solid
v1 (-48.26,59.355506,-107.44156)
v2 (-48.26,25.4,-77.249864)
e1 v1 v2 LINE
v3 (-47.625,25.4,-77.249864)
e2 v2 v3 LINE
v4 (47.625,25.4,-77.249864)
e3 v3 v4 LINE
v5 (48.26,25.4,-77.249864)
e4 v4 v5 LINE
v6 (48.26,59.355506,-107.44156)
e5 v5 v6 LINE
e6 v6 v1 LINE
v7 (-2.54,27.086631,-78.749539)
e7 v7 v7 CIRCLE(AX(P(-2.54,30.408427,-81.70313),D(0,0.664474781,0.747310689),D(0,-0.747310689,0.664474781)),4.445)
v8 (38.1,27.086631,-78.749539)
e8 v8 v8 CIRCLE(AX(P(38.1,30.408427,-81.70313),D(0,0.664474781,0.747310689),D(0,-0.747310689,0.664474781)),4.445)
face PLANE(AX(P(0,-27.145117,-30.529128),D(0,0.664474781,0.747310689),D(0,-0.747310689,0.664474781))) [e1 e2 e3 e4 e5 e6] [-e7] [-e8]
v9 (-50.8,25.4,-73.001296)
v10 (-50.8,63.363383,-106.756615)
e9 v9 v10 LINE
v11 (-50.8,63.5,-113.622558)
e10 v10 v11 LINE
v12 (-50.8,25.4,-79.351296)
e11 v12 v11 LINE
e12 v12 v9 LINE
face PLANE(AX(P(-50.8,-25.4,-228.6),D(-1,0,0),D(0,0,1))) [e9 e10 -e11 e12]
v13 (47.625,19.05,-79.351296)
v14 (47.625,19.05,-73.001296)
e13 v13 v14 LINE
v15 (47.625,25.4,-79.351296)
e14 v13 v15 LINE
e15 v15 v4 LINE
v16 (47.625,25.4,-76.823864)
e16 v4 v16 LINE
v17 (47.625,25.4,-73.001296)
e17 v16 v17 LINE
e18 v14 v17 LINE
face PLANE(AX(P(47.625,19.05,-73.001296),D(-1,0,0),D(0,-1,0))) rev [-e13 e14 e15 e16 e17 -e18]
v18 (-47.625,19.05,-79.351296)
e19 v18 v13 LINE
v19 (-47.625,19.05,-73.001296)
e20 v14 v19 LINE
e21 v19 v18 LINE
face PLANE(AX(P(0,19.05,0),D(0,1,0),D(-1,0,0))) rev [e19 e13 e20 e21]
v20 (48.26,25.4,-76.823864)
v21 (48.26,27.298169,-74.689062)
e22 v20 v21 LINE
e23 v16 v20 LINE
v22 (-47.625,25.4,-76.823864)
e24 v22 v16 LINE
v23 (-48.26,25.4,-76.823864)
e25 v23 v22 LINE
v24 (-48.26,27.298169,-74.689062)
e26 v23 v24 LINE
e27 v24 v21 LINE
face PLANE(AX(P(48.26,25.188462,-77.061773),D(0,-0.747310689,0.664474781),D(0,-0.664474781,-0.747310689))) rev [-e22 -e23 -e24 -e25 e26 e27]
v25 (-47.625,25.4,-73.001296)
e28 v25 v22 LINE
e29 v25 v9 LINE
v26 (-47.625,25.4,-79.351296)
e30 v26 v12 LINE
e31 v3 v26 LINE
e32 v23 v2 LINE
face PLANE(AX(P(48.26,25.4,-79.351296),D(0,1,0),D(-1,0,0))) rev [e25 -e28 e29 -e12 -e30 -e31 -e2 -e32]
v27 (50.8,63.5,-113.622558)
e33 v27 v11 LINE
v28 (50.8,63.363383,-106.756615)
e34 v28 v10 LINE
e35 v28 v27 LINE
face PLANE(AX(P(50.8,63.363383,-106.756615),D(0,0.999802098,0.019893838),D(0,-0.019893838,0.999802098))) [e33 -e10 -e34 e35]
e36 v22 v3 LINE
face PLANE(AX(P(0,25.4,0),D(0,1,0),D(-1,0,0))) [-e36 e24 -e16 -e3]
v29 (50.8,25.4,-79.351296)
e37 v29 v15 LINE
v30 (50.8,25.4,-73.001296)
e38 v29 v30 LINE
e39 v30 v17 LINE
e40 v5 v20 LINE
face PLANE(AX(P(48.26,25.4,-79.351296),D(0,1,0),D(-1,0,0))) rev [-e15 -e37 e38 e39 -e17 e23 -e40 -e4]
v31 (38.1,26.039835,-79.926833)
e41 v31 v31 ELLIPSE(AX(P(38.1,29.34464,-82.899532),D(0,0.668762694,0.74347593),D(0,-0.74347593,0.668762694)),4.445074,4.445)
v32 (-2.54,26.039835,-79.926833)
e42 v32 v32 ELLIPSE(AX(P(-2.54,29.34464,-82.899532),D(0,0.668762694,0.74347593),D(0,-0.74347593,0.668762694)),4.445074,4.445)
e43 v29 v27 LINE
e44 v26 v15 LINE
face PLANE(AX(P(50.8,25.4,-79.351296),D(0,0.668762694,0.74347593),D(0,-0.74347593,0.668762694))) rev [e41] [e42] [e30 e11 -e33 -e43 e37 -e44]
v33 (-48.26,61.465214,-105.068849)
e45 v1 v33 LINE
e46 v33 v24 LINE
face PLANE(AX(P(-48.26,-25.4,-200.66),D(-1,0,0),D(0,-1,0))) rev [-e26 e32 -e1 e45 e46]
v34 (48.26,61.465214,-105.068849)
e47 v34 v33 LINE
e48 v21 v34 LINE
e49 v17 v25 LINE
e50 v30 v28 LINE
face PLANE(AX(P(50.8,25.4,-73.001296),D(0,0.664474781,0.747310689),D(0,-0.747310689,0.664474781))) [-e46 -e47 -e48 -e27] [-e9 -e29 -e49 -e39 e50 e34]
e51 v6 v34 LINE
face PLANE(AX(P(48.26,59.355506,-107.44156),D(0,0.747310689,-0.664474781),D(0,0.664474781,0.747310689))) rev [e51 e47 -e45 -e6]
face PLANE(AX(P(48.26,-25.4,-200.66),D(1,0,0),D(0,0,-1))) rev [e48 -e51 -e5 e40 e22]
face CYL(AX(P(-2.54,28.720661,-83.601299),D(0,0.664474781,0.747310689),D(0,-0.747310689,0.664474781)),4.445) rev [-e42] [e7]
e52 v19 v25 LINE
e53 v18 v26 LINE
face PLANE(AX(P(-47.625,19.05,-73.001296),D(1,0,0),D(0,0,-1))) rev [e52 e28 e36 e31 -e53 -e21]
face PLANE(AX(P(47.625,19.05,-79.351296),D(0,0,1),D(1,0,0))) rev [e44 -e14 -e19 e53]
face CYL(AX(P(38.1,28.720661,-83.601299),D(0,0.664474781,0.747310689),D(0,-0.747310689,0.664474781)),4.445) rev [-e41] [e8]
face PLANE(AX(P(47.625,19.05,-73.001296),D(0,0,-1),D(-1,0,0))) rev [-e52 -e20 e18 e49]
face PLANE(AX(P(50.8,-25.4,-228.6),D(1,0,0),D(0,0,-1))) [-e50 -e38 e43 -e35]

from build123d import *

# Parameters (mm, degrees)
SKETCH1_W            = 101.6
SKETCH1_H            = 50.8
BOSS_EXTRUDE1_DEPTH  = 228.6
SKETCH2_W            = 96.52
SKETCH2_H            = 172.72
CUT_EXTRUDE1_DEPTH   = 50.8
BOSS_EXTRUDE2_DEPTH  = 50.8
BOSS_EXTRUDE3_DEPTH  = 101.6
SKETCH13_W           = 96.52
SKETCH13_H           = 25.4
CUT_EXTRUDE2_DEPTH   = 50.8
SKETCH14_W           = 96.52
SKETCH14_H           = 25.4
CUT_EXTRUDE3_DEPTH   = 50.8
SKETCH15_W           = 96.52
SKETCH15_H           = 50.8
CUT_EXTRUDE6_DEPTH   = 6.35
SKETCH16_W           = 96.52
SKETCH16_H           = 45.72
CUT_EXTRUDE7_DEPTH   = 3.175
SKETCH17_W           = 101.6
SKETCH17_H           = 25.4
CUT_EXTRUDE8_DEPTH   = 228.6
SKETCH20_W           = 6.35
SKETCH20_H           = 12.7
BOSS_EXTRUDE5_DEPTH  = 101.6
SKETCH24_W           = 12.7
SKETCH24_H           = 6.35
BOSS_EXTRUDE8_DEPTH  = 19.05
SKETCH26_W           = 12.7
SKETCH26_H           = 6.35
BOSS_EXTRUDE10_DEPTH = 19.05
SKETCH27_W           = 12.7
SKETCH27_H           = 6.35
BOSS_EXTRUDE11_DEPTH = 19.05
SKETCH33_W           = 96.52
SKETCH33_H           = 2.54
BOSS_EXTRUDE13_DEPTH = 2.54
SKETCH34_W           = 96.52
SKETCH34_H           = 2.54
BOSS_EXTRUDE17_DEPTH = 2.54
SKETCH36_W           = 218.44
SKETCH36_H           = 2.54
BOSS_EXTRUDE18_DEPTH = 2.54
SKETCH37_W           = 218.44
SKETCH37_H           = 2.54
BOSS_EXTRUDE19_DEPTH = 2.54
SKETCH45_W           = 13.208
SKETCH45_H           = 10.16
CUT_EXTRUDE19_DEPTH  = 6.35
CUT_EXTRUDE22_START  = -101.6
CUT_EXTRUDE22_DEPTH  = 101.6
SKETCH60_R           = 4.445
CUT_EXTRUDE23_DEPTH  = 2.54
SKETCH61_R           = 4.445
CUT_EXTRUDE24_DEPTH  = 2.54
SKETCH64_W           = 95.25
SKETCH64_H           = 6.35
BOSS_EXTRUDE33_DEPTH = 6.35


# Read off the part's stored shape, not the designer's step: Cut-Extrude22
with BuildPart() as part:
    # Sketch1 → Boss-Extrude1 (new body)
    with BuildSketch(Plane.XY):
        Rectangle(SKETCH1_W, SKETCH1_H)
    extrude(amount=-BOSS_EXTRUDE1_DEPTH)

    # Sketch2 → Cut-Extrude1 (cut)
    with BuildSketch(Plane(origin=(0, 25.4, 0), x_dir=(1, 0, 0), z_dir=(0, 1, 0))):
        with Locations((0, 114.3)):
            Rectangle(SKETCH2_W, SKETCH2_H)
    extrude(amount=-CUT_EXTRUDE1_DEPTH, mode=Mode.SUBTRACT)

    # Sketch3 → Boss-Extrude2 (add)
    with BuildSketch(Plane(origin=(0, 25.4, 0), x_dir=(1, 0, 0), z_dir=(0, 1, 0))):
        Polygon((48.26, 73.001295984), (48.26, 79.351295984), (-48.26, 79.351295984), (-48.26, 73.001295984), (0, 73.001295984), align=None)
    extrude(amount=-BOSS_EXTRUDE2_DEPTH)

    # Sketch11 → Boss-Extrude3 (add)
    with BuildSketch(Plane.ZY.offset(50.8)):
        Polygon((-79.351295984, 25.4), (-113.622558301, 63.5), (-106.756614843, 63.363382999), (-73.001295984, 25.4), align=None)
    extrude(amount=-BOSS_EXTRUDE3_DEPTH)

    # Sketch13 → Cut-Extrude2 (cut)
    with BuildSketch(Plane(origin=(0, 25.4, 0), x_dir=(1, 0, 0), z_dir=(0, 1, 0))):
        with Locations((0, 213.36)):
            Rectangle(SKETCH13_W, SKETCH13_H)
    extrude(amount=-CUT_EXTRUDE2_DEPTH, mode=Mode.SUBTRACT)

    # Sketch14 → Cut-Extrude3 (cut)
    with BuildSketch(Plane(origin=(0, 25.4, 0), x_dir=(1, 0, 0), z_dir=(0, 1, 0))):
        with Locations((0, 15.24)):
            Rectangle(SKETCH14_W, SKETCH14_H)
    extrude(amount=-CUT_EXTRUDE3_DEPTH, mode=Mode.SUBTRACT)

    # Sketch15 → Cut-Extrude6 (cut)
    with BuildSketch(Plane.XY.offset(-73.001295984)):
        Rectangle(SKETCH15_W, SKETCH15_H)
    extrude(amount=-CUT_EXTRUDE6_DEPTH, mode=Mode.SUBTRACT)

    # Sketch16 → Cut-Extrude7 (cut)
    with BuildSketch(Plane(origin=(0, -25.035409247, -28.156416881), x_dir=(1, 0, 0), z_dir=(0, 0.6644747806949454, 0.7473106889509907))):
        with Locations((0, 92.889211639)):
            Rectangle(SKETCH16_W, SKETCH16_H)
    extrude(amount=-CUT_EXTRUDE7_DEPTH, mode=Mode.SUBTRACT)

    # Sketch17 → Cut-Extrude8 (cut)
    with BuildSketch(Plane.XY):
        with Locations((0, -12.7)):
            Rectangle(SKETCH17_W, SKETCH17_H)
    extrude(amount=-CUT_EXTRUDE8_DEPTH, mode=Mode.SUBTRACT)

    # Sketch20 → Boss-Extrude5 (add)
    with BuildSketch(Plane.ZY.offset(50.8)):
        with Locations((-174.625, 6.35)):
            Rectangle(SKETCH20_W, SKETCH20_H)
    extrude(amount=-BOSS_EXTRUDE5_DEPTH)

    # Sketch24 → Boss-Extrude8 (add)
    with BuildSketch(Plane.XZ):
        with Locations((44.45, -76.176295984)):
            Rectangle(SKETCH24_W, SKETCH24_H)
    extrude(amount=BOSS_EXTRUDE8_DEPTH)

    # Sketch26 → Boss-Extrude10 (add)
    with BuildSketch(Plane.XZ):
        with Locations((-44.45, -174.625)):
            Rectangle(SKETCH26_W, SKETCH26_H)
    extrude(amount=BOSS_EXTRUDE10_DEPTH)

    # Sketch27 → Boss-Extrude11 (add)
    with BuildSketch(Plane.XZ):
        with Locations((44.45, -174.625)):
            Rectangle(SKETCH27_W, SKETCH27_H)
    extrude(amount=BOSS_EXTRUDE11_DEPTH)

    # Sketch33 → Boss-Extrude13 (add)
    with BuildSketch(Plane(origin=(0, 0, -2.54), x_dir=(-1, 0, 0), z_dir=(0, 0, -1))):
        with Locations((0, 12.7)):
            Rectangle(SKETCH33_W, SKETCH33_H)
    extrude(amount=BOSS_EXTRUDE13_DEPTH)

    # Sketch34 → Boss-Extrude17 (add)
    with BuildSketch(Plane.XY.offset(-226.06)):
        with Locations((0, 12.7)):
            Rectangle(SKETCH34_W, SKETCH34_H)
    extrude(amount=BOSS_EXTRUDE17_DEPTH)

    # Sketch36 → Boss-Extrude18 (add)
    with BuildSketch(Plane(origin=(-48.26, 0, 0), x_dir=(0, 0, -1), z_dir=(1, 0, 0))):
        with Locations((114.3, 12.7)):
            Rectangle(SKETCH36_W, SKETCH36_H)
    extrude(amount=BOSS_EXTRUDE18_DEPTH)

    # Sketch37 → Boss-Extrude19 (add)
    with BuildSketch(Plane.ZY.offset(-48.26)):
        with Locations((-114.3, 12.7)):
            Rectangle(SKETCH37_W, SKETCH37_H)
    extrude(amount=BOSS_EXTRUDE19_DEPTH)

    # Sketch45 → Cut-Extrude19 (cut)
    with BuildSketch(Plane.XY):
        with Locations((37.933039121, 12.7)):
            Rectangle(SKETCH45_W, SKETCH45_H)
        with Locations((-37.933039121, 12.7)):
            Rectangle(SKETCH45_W, SKETCH45_H)
    extrude(amount=-CUT_EXTRUDE19_DEPTH, mode=Mode.SUBTRACT)

    # Cut-Extrude22 outline → Cut-Extrude22 (cut)
    with BuildSketch(Plane.ZY.offset(50.8).offset(CUT_EXTRUDE22_START)):
        Polygon((-73.001295984, 0), (0, 0), (0, 25.4), (-228.6, 25.4), (-228.6, 0), (-177.8, 0), (-177.8, -19.05), (-171.45, -19.05), (-171.45, 0), (-79.351295984, 0), (-79.351295984, -19.05), (-73.001295984, -19.05), align=None)
    extrude(amount=CUT_EXTRUDE22_DEPTH, mode=Mode.SUBTRACT)

    # Sketch60 → Cut-Extrude23 (cut)
    with BuildSketch(Plane(origin=(0, -27.145116675, -30.529128319), x_dir=(1, 0, 0), z_dir=(0, 0.6644747806949455, 0.7473106889509905))):
        with Locations(Location((38.1, 77.014211639, 0), (0, 0, 270))):
            Circle(SKETCH60_R)
    extrude(amount=-CUT_EXTRUDE23_DEPTH, mode=Mode.SUBTRACT)

    # Sketch61 → Cut-Extrude24 (cut)
    with BuildSketch(Plane(origin=(0, -27.145116675, -30.529128319), x_dir=(1, 0, 0), z_dir=(0, 0.6644747806949455, 0.7473106889509905))):
        with Locations(Location((-2.54, 77.014211639, 0), (0, 0, 270))):
            Circle(SKETCH61_R)
    extrude(amount=-CUT_EXTRUDE24_DEPTH, mode=Mode.SUBTRACT)

    # Sketch64 → Boss-Extrude33 (add)
    with BuildSketch(Plane(origin=(0, 25.4, 0), x_dir=(-1, 0, 0), z_dir=(0, -1, 0))):
        with Locations((0, 76.176295984)):
            Rectangle(SKETCH64_W, SKETCH64_H)
    extrude(amount=BOSS_EXTRUDE33_DEPTH)


solid = part.part
